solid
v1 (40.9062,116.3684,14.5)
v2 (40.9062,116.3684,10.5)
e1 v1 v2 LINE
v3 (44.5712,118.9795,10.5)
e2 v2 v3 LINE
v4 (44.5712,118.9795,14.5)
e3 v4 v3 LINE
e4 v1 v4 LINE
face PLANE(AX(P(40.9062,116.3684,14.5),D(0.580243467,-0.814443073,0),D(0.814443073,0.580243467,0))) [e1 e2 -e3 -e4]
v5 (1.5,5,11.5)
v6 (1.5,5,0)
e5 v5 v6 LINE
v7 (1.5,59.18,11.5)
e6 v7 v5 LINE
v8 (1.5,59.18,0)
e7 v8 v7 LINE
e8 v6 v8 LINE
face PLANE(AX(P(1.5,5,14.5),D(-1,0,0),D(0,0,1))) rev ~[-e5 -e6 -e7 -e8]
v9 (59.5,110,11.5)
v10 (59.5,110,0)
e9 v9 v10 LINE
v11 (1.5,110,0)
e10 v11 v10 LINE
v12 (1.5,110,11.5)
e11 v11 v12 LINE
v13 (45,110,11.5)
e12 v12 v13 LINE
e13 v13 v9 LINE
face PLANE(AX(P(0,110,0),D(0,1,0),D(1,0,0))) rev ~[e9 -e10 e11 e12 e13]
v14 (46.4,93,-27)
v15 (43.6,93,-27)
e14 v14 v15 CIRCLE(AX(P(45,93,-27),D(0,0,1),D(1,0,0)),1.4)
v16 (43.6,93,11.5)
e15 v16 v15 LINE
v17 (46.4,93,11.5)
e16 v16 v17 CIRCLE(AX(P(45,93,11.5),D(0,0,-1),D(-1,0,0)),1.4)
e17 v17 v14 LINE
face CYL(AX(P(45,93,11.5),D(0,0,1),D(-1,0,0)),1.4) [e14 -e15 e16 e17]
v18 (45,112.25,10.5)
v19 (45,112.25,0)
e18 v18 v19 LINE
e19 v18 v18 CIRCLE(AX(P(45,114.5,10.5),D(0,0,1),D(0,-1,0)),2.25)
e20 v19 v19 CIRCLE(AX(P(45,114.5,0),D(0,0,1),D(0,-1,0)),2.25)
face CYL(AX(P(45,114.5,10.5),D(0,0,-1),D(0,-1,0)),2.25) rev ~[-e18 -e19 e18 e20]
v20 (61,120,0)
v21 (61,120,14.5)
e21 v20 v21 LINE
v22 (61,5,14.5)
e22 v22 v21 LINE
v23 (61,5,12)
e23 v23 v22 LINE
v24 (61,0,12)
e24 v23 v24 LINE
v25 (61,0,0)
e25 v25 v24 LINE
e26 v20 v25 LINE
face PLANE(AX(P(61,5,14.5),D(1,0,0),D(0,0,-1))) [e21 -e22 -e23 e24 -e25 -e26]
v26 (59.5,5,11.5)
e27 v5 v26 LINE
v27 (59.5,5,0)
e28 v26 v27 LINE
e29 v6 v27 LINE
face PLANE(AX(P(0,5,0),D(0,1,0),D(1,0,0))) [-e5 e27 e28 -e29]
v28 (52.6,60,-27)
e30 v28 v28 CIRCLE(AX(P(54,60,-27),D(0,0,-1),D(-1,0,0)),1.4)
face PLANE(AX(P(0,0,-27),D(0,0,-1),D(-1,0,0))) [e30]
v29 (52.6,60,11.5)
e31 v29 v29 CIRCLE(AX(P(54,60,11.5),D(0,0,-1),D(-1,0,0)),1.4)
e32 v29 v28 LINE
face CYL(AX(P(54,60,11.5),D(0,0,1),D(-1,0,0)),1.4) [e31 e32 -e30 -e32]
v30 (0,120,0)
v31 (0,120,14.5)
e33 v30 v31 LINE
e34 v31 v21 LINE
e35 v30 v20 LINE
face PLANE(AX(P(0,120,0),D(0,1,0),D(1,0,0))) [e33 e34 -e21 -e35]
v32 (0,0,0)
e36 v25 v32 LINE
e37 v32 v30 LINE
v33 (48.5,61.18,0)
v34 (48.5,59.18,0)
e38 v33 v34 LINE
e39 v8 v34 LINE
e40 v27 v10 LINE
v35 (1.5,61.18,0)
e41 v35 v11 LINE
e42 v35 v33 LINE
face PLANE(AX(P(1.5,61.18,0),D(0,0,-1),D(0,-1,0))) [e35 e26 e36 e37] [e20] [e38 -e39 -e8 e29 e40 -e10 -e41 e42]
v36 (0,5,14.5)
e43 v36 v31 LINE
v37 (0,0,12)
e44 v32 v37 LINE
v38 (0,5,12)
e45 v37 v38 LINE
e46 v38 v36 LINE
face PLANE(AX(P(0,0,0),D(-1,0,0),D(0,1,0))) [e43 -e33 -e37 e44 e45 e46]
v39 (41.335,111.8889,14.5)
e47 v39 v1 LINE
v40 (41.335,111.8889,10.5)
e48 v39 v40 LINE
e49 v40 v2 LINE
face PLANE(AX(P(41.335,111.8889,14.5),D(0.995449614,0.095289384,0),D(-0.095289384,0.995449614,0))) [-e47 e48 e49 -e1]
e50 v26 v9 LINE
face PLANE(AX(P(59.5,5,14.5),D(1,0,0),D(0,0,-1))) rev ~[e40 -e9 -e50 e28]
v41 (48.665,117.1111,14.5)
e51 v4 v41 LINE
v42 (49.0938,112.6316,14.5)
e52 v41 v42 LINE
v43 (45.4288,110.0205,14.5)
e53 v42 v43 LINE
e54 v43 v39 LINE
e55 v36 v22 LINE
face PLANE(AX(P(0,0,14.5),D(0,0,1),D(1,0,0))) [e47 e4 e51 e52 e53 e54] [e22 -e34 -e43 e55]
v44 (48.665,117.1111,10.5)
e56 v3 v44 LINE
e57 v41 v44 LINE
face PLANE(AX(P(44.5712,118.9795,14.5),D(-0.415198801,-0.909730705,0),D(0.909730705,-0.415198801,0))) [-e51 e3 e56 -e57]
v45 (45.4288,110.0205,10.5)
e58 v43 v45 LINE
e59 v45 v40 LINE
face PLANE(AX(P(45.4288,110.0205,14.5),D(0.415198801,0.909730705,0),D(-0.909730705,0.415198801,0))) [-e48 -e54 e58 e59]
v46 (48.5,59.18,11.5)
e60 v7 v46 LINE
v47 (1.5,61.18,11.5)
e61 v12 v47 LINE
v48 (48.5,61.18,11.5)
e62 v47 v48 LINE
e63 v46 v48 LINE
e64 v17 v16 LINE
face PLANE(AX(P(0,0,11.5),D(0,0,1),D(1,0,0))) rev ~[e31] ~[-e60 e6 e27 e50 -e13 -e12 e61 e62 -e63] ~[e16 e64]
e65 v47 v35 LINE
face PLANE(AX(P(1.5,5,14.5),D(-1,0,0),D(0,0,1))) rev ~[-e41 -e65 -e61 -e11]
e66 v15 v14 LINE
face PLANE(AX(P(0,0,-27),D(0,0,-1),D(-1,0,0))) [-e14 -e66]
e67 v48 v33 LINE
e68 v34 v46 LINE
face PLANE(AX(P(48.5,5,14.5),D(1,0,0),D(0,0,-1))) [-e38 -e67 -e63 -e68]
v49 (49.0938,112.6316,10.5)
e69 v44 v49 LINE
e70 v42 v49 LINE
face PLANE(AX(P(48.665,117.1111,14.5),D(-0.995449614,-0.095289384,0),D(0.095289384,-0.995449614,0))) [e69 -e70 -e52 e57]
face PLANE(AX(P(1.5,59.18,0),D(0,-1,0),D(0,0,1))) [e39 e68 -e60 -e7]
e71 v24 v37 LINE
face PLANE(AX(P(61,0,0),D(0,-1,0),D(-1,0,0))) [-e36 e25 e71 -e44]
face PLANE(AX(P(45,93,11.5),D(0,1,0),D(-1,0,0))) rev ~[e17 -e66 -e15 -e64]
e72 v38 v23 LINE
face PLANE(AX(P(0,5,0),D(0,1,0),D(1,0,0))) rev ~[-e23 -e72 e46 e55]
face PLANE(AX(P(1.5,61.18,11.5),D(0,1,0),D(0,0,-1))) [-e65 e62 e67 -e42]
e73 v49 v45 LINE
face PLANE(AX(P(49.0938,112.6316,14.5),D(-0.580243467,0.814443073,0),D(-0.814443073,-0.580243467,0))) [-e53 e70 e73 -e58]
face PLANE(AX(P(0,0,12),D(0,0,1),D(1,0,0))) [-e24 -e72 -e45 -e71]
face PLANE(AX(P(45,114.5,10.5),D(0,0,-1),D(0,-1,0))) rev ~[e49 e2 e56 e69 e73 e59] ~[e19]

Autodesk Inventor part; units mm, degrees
ref_plane "YZ Plane" through (0, 0, 0) normal (1, 0, 0) x (0, 1, 0)
ref_plane "XZ Plane" through (0, 0, 0) normal (0, 1, 0) x (-1, 0, 0)
ref_plane "XY Plane" through (0, 0, 0) normal (0, 0, 1) x (1, 0, 0)
sketch "Sketch1" plane through (0, 0, 0) normal (0, 0, 1) x (1, 0, 0)
  line L0 (0, 0) -> (0, 120)
  line L1 (0, 120) -> (61, 120)
  line L2 (61, 120) -> (61, 0)
  line L3 (61, 0) -> (0, 0)
  line L4 (0, 5) -> (61, 5)
  line L5 (0, 110) -> (61, 110)
  dimension "d0" = 120
  dimension "d1" = 61
  dimension "d14" = 10
  dimension "d15" = 5
extrude "Extrusion1" add sketch "Sketch1" along normal blind 14.5 contours L0 L5 L2 L4 | L0 L1 L2 L5
extrude "Extrusion2" cut sketch "Sketch1" along normal blind 11.5 contours L0 L5 L2 L4
extrude "Extrusion3" add sketch "Sketch1" along normal blind 12 contours L0 L4 L2 L3
sketch "Sketch2" plane through (61, 5, 14.5) normal (1, 0, 0) x (0, 0, -1)
  line L0 (14.5, 115) -> (0, 115) projected
  line L1 (14.5, 115) -> (0, 115)
  line L2 (0, 0) -> (0, 115) projected
  line L3 (0, 115) -> (0, 0)
  line L4 (0, 0) -> (14.5, 0)
  line L5 (14.5, 0) -> (14.5, 115)
  point P0 (14.5, -5)
extrude "Extrusion4" add sketch "Sketch2" against normal blind 1.5
sketch "Sketch3" plane through (0, 5, 14.5) normal (-1, 0, 0) x (0, 0, 1)
  line L0 (-14.5, 115) -> (-14.5, 105) projected
  line L1 (-14.5, 115) -> (0, 115) projected
  line L2 (-14.5, 115) -> (0, 115)
  line L3 (0, 0) -> (0, 115) projected
  line L4 (0, 115) -> (0, 0)
  line L5 (0, 0) -> (-14.5, 0)
  line L6 (-14.5, 0) -> (-14.5, 115)
  point P0 (-14.5, -5)
extrude "Extrusion5" add sketch "Sketch3" against normal blind 1.5
sketch "Sketch4" plane through (0, 0, 14.5) normal (0, 0, 1) x (1, 0, 0)
  circle A0 centre (45, 114.5) radius 2.25
  line L0 (61, 120) -> (0, 120) projected
  line L1 (45, 116.75) -> (46.9486, 115.625)
  line L2 (46.9486, 115.625) -> (46.9486, 113.375)
  line L3 (46.9486, 113.375) -> (45, 112.25)
  line L4 (45, 112.25) -> (43.0514, 113.375)
  line L5 (43.0514, 113.375) -> (43.0514, 115.625)
  line L6 (43.0514, 115.625) -> (45, 116.75)
  line L7 (0, 120) -> (0, 5) projected
  point P0 (0, 0)
  point P1 (30.5, 120)
  dimension "d23" = 4.5
  dimension "d60" = 45
hole "Hole1" at (45, 114.5, 14.5) direction (0, 0, -1) diameter 4.5 end through all counterbore diameter 9 counterbore depth 4
sketch "Sketch8" plane through (0, 0, 11.5) normal (0, 0, -1) x (-1, 0, 0)
  line L0 (-59.5, 110) -> (-1.5, 110) projected
  line L1 (-45, 110) -> (-45, 93)
  circle A0 centre (-45, 93) radius 1.4
  line L2 (-46.4, 93) -> (-43.6, 93)
  circle A1 centre (-36, 60) radius 1.4
  circle A2 centre (-54, 60) radius 1.4
  line L3 (-61, 0) -> (-61, 120) projected
  line L4 (-59.5, 110) -> (-59.5, 5) projected
  point P0 (0, 0)
  dimension "d45" = 17
  dimension "d46" = 2.8
  dimension "d56" = 2.8
  dimension "d57" = 2.8
  dimension "d66" = 33
  dimension "d67" = 33
  dimension "d68" = 9
  dimension "d69" = 18
extrude "Extrusion8" add sketch "Sketch8" along normal blind 38.5 contours A0 L2 L1 | L1 L2 A0
sketch "Sketch9" plane through (0, 0, 14.5) normal (0, 0, 1) x (1, 0, 0)
  circle A0 centre (45, 114.5) radius 2.25 projected
  circle A1 centre (45, 114.5) radius 4.5 projected
  line L0 (48.665, 117.1111) -> (49.0938, 112.6316)
  line L1 (49.0938, 112.6316) -> (45.4288, 110.0205)
  line L2 (45.4288, 110.0205) -> (41.335, 111.8889)
  line L3 (41.335, 111.8889) -> (40.9062, 116.3684)
  line L4 (40.9062, 116.3684) -> (44.5712, 118.9795)
  line L5 (44.5712, 118.9795) -> (48.665, 117.1111)
  point P0 (0, 0)
  point P1 (45, 110)
  point P2 (44.5712, 118.9795)
  point P3 (44.5712, 118.9795)
  point P4 (40.9062, 116.3684)
  point P5 (40.9062, 116.3684)
  point P6 (41.335, 111.8889)
  point P7 (41.335, 111.8889)
  point P8 (49.0938, 112.6316)
  point P9 (45.4288, 110.0205)
  point P10 (49.0938, 112.6316)
  point P11 (45.4288, 110.0205)
  dimension "d53" = 8
extrude "Extrusion9" add sketch "Sketch9" against normal blind 4 contours A1 L0 | L5 A1 | L4 A1 | A1 L2 | L3 A1
extrude "Extrusion10" add sketch "Sketch9" against normal blind 4 contours A1 L1
sketch "Sketch10" plane through (45, 93, -27) normal (0, 0, -1) x (1, 0, 0)
  arc A0 (-1.4, 0) -> (1.4, 0) centre (0, 0) ccw projected
  line L0 (-1.4, 0) -> (1.4, 0)
  point P0 (-45, 93)
extrude "Extrusion11" add sketch "Sketch8" along normal blind 38.5 contours A2
sketch "Sketch11" plane through (1.5, 5, 14.5) normal (1, 0, 0) x (0, 0, -1)
  line L0 (3, 105) -> (14.5, 105) projected
  line L1 (3, 105) -> (3, 56.18)
  line L2 (3, 0) -> (3, 105) projected
  line L3 (3, 56.18) -> (14.5, 56.18)
  line L4 (14.5, 115) -> (14.5, -5) projected
  line L5 (14.5, 56.18) -> (14.5, 54.18)
  line L6 (14.5, 54.18) -> (3, 54.18)
  line L7 (3, 54.18) -> (3, 56.18)
  point P0 (3, 54.18)
  dimension "d70" = 48.82
  dimension "d71" = 2
extrude "Extrusion12" add sketch "Sketch11" along normal blind 47 contours L3 L4 L6 L2
properties part number "Cover of DC Housing_3DPrint"
